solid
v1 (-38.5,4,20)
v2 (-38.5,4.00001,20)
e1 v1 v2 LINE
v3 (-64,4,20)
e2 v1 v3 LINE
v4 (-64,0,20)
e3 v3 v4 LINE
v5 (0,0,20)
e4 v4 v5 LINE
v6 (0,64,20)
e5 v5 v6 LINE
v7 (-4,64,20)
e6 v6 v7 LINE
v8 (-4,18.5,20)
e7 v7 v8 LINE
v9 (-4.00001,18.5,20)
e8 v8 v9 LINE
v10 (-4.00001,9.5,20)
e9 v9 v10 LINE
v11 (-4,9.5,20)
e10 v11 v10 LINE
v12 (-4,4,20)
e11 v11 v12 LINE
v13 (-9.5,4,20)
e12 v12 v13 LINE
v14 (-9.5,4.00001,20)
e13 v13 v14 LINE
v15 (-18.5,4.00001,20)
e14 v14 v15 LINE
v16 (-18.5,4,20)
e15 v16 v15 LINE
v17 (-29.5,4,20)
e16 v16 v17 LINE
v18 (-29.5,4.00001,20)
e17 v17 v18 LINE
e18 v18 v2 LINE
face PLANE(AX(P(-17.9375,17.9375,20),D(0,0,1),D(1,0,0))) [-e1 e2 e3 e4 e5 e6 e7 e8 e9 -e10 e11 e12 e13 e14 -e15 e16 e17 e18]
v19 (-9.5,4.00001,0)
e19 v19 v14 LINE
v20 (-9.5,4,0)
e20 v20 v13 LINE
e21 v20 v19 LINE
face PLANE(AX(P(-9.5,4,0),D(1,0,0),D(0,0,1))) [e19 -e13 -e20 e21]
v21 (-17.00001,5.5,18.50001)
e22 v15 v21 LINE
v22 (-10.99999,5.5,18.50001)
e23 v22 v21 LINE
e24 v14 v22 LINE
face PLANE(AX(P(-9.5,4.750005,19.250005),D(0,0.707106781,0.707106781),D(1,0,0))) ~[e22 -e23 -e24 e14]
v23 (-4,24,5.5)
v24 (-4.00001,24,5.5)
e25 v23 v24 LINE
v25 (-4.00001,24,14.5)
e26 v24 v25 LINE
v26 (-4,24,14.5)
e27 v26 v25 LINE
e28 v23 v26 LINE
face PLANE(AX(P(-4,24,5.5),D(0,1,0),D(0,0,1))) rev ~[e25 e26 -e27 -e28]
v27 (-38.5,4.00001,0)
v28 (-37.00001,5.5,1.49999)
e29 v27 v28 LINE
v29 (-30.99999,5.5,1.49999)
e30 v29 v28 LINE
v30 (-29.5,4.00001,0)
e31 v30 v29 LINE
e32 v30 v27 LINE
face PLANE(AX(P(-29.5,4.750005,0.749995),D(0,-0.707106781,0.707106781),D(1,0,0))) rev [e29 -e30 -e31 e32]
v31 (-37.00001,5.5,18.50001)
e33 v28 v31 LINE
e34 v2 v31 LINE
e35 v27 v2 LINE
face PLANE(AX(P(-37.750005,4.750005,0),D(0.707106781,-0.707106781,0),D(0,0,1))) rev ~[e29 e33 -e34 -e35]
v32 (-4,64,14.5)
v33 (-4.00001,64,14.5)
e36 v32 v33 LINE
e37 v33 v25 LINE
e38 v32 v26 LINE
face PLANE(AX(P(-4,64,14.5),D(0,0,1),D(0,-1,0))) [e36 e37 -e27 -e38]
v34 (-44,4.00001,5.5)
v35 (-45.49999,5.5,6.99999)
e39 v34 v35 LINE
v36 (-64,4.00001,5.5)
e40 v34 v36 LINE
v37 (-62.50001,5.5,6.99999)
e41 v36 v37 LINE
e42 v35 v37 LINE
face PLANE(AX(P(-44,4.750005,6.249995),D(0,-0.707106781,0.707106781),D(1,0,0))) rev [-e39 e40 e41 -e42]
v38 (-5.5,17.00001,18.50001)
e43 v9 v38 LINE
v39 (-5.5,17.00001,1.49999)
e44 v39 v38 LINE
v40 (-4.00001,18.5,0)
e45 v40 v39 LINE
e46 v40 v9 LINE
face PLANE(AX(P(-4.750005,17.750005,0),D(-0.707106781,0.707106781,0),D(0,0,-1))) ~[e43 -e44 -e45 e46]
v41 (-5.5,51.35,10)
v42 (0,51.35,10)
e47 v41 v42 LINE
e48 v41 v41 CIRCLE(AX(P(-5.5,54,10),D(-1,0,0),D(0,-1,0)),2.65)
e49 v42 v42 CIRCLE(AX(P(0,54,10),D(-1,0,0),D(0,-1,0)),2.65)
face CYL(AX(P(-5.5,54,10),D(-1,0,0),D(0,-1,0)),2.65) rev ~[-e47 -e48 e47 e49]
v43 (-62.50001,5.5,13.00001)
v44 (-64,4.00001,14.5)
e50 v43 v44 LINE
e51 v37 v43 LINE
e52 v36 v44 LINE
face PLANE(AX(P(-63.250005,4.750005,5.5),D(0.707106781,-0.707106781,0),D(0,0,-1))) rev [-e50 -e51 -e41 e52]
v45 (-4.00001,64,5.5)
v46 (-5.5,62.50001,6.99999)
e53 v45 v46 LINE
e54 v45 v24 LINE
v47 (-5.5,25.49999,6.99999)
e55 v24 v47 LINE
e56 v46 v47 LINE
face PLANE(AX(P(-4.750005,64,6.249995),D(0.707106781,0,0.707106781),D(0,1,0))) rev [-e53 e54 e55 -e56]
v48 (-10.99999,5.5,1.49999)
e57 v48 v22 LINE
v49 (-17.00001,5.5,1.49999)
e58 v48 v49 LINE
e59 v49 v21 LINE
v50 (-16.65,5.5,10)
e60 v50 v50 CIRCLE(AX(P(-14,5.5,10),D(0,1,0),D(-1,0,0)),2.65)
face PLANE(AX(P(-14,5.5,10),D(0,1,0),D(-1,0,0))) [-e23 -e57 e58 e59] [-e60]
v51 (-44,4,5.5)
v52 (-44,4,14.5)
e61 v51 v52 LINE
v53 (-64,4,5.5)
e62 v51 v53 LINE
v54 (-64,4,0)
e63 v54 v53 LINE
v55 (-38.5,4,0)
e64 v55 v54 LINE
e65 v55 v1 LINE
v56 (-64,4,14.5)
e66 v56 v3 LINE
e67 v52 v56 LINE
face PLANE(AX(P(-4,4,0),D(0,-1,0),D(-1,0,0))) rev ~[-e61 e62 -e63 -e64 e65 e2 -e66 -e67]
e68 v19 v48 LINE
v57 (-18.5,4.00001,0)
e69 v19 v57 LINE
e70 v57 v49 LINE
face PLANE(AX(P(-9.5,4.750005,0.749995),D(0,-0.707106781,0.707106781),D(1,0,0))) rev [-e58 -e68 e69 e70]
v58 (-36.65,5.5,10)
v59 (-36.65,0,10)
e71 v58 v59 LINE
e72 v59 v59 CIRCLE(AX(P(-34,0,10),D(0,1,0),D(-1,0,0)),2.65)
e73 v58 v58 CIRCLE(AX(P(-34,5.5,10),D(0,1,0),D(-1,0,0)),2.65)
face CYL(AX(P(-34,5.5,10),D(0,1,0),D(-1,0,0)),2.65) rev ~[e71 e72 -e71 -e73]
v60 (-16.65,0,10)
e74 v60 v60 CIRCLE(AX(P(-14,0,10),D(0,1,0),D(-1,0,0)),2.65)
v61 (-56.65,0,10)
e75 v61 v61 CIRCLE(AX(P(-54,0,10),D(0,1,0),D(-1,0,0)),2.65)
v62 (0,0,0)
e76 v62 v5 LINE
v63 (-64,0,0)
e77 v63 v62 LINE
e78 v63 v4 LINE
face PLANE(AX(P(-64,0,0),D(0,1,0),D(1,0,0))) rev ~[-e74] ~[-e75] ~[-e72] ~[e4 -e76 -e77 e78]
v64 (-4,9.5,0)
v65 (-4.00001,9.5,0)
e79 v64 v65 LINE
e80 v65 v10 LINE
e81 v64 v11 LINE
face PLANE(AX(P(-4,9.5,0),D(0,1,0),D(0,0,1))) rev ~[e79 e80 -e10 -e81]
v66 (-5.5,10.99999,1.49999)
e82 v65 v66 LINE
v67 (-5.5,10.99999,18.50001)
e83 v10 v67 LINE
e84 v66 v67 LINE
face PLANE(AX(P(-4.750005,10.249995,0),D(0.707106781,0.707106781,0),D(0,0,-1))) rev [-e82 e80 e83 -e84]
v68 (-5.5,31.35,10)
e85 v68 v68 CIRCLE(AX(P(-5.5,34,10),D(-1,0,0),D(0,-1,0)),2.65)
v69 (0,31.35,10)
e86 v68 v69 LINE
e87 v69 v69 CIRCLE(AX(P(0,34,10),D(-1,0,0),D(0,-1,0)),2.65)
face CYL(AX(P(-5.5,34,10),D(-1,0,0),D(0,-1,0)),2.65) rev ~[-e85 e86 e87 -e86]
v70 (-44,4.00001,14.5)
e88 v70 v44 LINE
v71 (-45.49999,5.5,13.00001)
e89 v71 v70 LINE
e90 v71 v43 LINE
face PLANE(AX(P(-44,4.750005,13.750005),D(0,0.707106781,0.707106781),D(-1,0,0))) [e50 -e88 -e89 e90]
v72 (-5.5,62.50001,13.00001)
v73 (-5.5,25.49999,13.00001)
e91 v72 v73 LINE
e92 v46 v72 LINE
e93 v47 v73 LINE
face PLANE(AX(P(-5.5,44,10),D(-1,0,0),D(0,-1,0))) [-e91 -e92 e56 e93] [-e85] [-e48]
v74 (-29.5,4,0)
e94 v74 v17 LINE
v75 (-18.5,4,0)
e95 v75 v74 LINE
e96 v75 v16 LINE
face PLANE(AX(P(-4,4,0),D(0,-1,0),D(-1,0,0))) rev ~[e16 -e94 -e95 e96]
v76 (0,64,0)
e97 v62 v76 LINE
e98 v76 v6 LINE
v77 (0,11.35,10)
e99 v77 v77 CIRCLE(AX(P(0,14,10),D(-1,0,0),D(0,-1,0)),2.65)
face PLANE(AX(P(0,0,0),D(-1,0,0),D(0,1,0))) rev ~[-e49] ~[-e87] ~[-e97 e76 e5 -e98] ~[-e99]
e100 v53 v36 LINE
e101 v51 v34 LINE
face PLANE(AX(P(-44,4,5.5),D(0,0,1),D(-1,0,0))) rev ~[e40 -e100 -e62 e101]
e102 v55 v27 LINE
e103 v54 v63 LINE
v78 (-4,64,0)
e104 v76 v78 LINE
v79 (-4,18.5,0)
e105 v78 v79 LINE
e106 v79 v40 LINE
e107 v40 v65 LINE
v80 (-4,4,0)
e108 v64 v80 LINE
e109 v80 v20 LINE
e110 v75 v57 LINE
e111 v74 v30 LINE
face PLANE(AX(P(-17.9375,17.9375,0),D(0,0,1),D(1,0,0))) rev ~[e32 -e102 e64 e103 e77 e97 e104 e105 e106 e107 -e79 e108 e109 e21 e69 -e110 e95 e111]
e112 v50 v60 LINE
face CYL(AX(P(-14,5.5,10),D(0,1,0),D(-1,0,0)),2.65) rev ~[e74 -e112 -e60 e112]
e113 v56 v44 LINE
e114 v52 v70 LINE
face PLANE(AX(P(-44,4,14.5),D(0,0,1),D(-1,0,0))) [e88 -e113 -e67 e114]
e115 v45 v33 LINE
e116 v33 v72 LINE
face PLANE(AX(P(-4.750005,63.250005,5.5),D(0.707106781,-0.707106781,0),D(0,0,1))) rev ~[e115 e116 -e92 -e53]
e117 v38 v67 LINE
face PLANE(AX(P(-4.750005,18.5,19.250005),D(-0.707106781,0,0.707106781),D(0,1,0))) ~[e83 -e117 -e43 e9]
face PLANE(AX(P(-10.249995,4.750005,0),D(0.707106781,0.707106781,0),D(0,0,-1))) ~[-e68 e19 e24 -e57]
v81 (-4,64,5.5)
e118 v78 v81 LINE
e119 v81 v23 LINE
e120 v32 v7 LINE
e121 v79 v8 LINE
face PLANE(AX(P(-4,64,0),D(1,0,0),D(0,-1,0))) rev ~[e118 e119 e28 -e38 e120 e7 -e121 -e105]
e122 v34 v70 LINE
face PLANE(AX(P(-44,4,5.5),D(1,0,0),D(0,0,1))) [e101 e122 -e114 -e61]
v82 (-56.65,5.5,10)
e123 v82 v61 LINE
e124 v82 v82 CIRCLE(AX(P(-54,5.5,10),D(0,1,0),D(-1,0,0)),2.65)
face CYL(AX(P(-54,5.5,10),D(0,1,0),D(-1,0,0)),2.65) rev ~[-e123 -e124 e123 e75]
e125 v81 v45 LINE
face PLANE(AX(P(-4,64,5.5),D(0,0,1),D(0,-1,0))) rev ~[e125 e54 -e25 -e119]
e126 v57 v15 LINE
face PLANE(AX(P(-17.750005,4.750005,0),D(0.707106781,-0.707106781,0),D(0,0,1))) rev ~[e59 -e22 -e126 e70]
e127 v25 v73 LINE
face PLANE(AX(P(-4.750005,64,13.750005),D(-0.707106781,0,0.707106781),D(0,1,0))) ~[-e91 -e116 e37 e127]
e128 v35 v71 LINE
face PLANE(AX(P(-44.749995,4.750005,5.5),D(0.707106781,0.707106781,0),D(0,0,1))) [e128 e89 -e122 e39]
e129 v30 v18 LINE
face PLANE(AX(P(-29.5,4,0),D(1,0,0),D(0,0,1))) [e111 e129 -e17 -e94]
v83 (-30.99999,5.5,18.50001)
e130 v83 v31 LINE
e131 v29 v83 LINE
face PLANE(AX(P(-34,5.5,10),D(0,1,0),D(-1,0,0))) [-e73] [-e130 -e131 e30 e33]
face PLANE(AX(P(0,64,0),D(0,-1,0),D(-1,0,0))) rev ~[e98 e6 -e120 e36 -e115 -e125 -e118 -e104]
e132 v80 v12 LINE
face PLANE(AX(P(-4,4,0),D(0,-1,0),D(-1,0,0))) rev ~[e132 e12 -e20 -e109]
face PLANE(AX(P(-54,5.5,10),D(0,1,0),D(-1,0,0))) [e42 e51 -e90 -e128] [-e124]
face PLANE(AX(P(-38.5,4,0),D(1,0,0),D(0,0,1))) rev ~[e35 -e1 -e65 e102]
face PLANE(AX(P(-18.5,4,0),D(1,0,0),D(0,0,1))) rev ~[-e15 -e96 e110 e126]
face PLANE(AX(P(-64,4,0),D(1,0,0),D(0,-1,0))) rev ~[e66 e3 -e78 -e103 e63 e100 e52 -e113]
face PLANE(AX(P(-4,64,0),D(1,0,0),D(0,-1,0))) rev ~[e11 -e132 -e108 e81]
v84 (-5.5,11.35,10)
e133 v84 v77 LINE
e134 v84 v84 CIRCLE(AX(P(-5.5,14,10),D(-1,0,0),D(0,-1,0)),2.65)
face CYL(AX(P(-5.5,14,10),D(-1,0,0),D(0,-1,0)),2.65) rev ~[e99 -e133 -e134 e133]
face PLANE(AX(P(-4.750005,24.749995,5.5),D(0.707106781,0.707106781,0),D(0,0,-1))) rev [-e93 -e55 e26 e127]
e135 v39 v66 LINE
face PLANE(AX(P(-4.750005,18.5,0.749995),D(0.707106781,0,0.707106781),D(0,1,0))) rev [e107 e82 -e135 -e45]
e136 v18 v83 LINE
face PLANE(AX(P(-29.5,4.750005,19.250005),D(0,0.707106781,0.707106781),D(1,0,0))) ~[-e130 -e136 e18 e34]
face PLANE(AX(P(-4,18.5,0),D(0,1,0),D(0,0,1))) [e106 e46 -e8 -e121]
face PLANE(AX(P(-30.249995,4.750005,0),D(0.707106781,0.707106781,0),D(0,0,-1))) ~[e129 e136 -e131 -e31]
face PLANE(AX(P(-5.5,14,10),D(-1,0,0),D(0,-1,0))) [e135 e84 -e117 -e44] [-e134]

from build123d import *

# Parameters (mm, degrees)
F1_DEPTH  = 20
F2_W      = 9
F2_H      = 20
F2_W_2    = 20
F2_H_2    = 9
F3_DEPTH  = 1.5
F4_W      = 40
F4_H      = 9
F4_W_2    = 9
F4_H_2    = 20
F5_DEPTH  = 1.5
F6_SIZE   = 1.49999
F7_R      = 2.65
F8_DEPTH  = 5.5
F9_R      = 2.65
F10_DEPTH = 5.5


# Not quite as in the source:
# - a fillet or chamfer is up to 0.001 mm smaller than in the source, because OpenCascade refuses the exact size


with BuildPart() as f1:
    # F0 (on Top) → F1 (new body)
    with BuildSketch(Plane.XY):
        Polygon((-64, 0), (0, 0), (0, 64), (-4, 64), (-4, 4), (-64, 4), align=None)
    extrude(amount=F1_DEPTH)

    # F2 (on face) → F3 (join)
    with BuildSketch(Plane(origin=(0, 4, 0), x_dir=(-1, 0, 0), z_dir=(0, 1, 0))):
        with Locations((14, 10)):
            Rectangle(F2_W, F2_H)
        with Locations((34, 10)):
            Rectangle(F2_W, F2_H)
        with Locations((54, 10)):
            Rectangle(F2_W_2, F2_H_2)
    extrude(amount=F3_DEPTH)

    # F4 (on face) → F5 (join)
    with BuildSketch(Plane(origin=(-4, 0, 0), x_dir=(0, -1, 0), z_dir=(-1, 0, 0))):
        with Locations((-44, 10)):
            Rectangle(F4_W, F4_H)
        with Locations((-14, 10)):
            Rectangle(F4_W_2, F4_H_2)
    extrude(amount=F5_DEPTH)

    # F6 (size 1.5 in the source; OpenCascade refuses exactly that, so slightly less here)
    f6_edges = [f1.edges().sort_by_distance(p)[0] for p in [
        (-5.5, 64, 10),
        (-5.5, 44, 14.5),
        (-5.5, 44, 5.5),
        (-5.5, 24, 10),
        (-54, 5.5, 14.5),
        (-54, 5.5, 5.5),
        (-44, 5.5, 10),
        (-64, 5.5, 10),
        (-34, 5.5, 20),
        (-29.5, 5.5, 10),
        (-34, 5.5, 0),
        (-38.5, 5.5, 10),
        (-14, 5.5, 20),
        (-9.5, 5.5, 10),
        (-14, 5.5, 0),
        (-18.5, 5.5, 10),
        (-5.5, 9.5, 10),
        (-5.5, 14, 20),
        (-5.5, 18.5, 10),
        (-5.5, 14, 0),
    ]]
    chamfer(f6_edges, length=F6_SIZE)

    # F7 (on face) → F8 (cut, through all)
    with BuildSketch(Plane(origin=(0, 5.5, 0), x_dir=(-1, 0, 0), z_dir=(0, 1, 0))):
        with Locations((14, 10)):
            Circle(F7_R)
        with Locations((34, 10)):
            Circle(F7_R)
        with Locations((54, 10)):
            Circle(F7_R)
    extrude(amount=-F8_DEPTH, mode=Mode.SUBTRACT)

    # F9 (on face) → F10 (cut, through all)
    with BuildSketch(Plane(origin=(-5.5, 0, 0), x_dir=(0, -1, 0), z_dir=(-1, 0, 0))):
        with Locations((-54, 10)):
            Circle(F9_R)
        with Locations((-34, 10)):
            Circle(F9_R)
        with Locations((-14, 10)):
            Circle(F9_R)
    extrude(amount=-F10_DEPTH, mode=Mode.SUBTRACT)


solid = f1.part
